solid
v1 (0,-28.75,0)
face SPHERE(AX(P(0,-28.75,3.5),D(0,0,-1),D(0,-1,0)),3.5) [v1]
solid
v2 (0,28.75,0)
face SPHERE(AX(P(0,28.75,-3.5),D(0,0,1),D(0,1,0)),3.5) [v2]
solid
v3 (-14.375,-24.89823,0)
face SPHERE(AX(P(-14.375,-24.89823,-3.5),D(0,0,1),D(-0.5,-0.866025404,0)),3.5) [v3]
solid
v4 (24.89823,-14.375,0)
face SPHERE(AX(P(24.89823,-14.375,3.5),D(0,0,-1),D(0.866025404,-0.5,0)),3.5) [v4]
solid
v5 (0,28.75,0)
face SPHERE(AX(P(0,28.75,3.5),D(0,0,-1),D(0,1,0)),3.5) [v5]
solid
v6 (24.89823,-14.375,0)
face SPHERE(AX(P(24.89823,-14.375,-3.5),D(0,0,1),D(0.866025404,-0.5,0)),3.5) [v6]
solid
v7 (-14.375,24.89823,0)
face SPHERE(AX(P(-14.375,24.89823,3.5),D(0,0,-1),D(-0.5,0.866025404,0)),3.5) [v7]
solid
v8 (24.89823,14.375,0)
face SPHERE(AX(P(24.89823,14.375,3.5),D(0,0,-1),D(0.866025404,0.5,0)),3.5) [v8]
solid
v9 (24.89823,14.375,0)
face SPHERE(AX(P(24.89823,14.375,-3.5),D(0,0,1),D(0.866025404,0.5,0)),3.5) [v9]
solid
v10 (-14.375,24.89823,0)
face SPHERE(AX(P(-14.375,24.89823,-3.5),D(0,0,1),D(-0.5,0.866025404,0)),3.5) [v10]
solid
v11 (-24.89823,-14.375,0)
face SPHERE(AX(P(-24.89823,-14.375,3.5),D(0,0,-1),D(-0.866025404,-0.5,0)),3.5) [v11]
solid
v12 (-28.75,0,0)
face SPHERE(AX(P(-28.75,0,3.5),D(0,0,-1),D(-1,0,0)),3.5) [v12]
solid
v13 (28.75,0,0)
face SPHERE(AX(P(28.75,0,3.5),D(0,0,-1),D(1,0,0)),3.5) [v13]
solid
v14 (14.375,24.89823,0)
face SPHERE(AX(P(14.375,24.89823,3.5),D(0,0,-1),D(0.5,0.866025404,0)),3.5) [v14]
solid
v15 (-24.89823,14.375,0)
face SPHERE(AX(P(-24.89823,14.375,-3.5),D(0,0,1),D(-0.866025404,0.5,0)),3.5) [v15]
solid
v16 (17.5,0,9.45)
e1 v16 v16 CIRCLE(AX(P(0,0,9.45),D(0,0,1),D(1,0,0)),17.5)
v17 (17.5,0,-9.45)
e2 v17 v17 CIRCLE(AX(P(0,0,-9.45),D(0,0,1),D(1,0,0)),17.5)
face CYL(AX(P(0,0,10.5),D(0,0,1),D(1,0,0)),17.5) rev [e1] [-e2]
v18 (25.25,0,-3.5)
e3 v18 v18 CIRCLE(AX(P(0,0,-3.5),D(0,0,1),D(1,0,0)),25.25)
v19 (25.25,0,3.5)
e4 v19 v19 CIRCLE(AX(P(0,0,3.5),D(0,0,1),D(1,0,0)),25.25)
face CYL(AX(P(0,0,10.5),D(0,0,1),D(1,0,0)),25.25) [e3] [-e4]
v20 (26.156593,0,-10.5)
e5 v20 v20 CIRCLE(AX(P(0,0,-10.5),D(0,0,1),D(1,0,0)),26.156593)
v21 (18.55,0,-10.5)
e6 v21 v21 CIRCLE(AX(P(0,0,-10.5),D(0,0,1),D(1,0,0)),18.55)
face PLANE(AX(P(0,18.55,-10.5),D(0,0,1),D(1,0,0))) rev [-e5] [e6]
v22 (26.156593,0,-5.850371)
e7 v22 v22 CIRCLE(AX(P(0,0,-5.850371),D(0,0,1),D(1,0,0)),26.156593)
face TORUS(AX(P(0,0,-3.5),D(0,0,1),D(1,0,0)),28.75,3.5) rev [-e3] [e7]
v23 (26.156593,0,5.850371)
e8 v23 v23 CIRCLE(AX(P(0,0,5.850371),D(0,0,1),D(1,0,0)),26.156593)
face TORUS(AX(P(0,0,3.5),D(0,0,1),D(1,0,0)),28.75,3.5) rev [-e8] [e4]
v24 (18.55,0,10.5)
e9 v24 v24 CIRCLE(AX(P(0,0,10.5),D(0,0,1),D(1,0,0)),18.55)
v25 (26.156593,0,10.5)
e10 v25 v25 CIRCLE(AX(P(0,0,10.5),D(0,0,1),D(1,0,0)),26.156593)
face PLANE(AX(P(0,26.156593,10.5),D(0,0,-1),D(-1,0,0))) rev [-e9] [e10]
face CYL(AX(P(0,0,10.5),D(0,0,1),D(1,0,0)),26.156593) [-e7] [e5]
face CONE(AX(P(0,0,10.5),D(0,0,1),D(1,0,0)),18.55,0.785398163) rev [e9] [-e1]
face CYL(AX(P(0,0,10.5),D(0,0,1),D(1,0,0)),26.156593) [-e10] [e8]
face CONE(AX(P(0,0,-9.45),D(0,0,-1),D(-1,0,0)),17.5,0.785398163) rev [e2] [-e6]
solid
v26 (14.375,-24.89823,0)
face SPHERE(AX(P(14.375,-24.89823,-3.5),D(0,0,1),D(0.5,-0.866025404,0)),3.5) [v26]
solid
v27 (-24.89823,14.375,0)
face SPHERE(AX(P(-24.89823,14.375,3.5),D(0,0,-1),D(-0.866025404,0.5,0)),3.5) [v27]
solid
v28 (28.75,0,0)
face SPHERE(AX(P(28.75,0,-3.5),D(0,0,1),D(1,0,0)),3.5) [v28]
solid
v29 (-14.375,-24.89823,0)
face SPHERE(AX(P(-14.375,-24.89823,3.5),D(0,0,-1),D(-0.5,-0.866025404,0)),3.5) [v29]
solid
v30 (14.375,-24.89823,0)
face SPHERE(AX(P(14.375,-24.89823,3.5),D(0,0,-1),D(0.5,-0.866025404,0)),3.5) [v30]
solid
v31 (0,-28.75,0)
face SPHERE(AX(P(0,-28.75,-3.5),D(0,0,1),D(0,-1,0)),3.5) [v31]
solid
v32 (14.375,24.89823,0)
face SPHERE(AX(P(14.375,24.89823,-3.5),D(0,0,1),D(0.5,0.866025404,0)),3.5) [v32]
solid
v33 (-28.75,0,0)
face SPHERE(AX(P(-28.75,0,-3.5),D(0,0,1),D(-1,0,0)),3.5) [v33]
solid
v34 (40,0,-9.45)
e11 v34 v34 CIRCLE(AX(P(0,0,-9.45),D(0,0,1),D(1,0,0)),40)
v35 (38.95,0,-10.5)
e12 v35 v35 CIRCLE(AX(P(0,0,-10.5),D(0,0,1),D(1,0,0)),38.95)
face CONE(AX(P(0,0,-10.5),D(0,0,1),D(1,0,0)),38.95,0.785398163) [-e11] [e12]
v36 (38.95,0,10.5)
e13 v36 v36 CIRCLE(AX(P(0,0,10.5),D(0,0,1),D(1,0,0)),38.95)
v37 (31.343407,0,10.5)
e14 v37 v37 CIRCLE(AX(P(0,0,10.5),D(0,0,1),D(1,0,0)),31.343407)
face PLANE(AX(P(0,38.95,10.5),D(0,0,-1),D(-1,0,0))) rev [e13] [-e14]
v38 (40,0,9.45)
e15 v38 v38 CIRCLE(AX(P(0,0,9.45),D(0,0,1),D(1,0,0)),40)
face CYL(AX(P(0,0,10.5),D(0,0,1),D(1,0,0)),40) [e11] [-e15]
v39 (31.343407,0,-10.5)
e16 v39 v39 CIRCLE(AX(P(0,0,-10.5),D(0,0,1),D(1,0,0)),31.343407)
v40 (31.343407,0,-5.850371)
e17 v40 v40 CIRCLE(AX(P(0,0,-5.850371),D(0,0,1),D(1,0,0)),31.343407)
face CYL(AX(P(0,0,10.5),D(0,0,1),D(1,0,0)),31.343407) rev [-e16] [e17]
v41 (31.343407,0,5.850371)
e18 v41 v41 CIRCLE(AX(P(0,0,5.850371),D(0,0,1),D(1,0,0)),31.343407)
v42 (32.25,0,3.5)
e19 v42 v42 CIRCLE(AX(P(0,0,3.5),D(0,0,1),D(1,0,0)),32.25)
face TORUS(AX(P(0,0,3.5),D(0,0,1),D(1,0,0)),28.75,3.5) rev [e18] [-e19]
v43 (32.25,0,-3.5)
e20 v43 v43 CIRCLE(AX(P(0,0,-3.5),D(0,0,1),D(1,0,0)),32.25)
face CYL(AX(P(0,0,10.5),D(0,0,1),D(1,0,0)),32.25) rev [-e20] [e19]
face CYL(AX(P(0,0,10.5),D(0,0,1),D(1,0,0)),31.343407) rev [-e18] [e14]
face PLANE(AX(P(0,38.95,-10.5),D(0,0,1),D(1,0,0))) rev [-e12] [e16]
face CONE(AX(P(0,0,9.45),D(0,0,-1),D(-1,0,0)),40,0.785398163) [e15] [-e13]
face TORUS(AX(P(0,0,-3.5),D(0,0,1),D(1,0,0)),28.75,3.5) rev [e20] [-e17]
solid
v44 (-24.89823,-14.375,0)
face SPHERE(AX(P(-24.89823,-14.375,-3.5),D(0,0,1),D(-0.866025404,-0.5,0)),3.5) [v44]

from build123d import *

# Parameters (mm, degrees)
CIRPATTERN1_ANGLE    = 180
CIRPATTERN1_2_ANGLE  = 180
CIRPATTERN1_3_ANGLE  = 180
CIRPATTERN1_4_ANGLE  = 180
CIRPATTERN1_5_ANGLE  = 180
CIRPATTERN1_6_ANGLE  = 180
CIRPATTERN1_7_ANGLE  = 180
CIRPATTERN1_8_ANGLE  = 180
CIRPATTERN1_9_ANGLE  = 180
CIRPATTERN1_10_ANGLE = 180
CIRPATTERN1_11_ANGLE = 180
CIRPATTERN1_12_ANGLE = 30
CIRPATTERN1_13_ANGLE = 60
CIRPATTERN1_14_ANGLE = 90
CIRPATTERN1_15_ANGLE = 120
CIRPATTERN1_16_ANGLE = 150
CIRPATTERN1_17_ANGLE = 180
CIRPATTERN1_18_ANGLE = 150
CIRPATTERN1_19_ANGLE = 120
CIRPATTERN1_20_ANGLE = 90
CIRPATTERN1_21_ANGLE = 60
CIRPATTERN1_22_ANGLE = 30


with BuildPart() as part:
    # Sketch1 → Revolve1 (revolve)
    with BuildSketch(Plane(origin=(0, 0, 0), x_dir=(0, 0, -1), z_dir=(1, 0, 0)), mode=Mode.PRIVATE) as revolve1_sk:
        with BuildLine():
            Line((9.45, 40), (-9.45, 40))
            Line((-9.45, 40), (-10.5, 38.95))
            Line((-10.5, 38.95), (-10.5, 31.343406593))
            Line((-10.5, 31.343406593), (-5.85037066, 31.343406593))
            ThreePointArc((-5.85037066, 31.343406593), (-4.759578684, 32.015495604), (-3.5, 32.25))
            Line((-3.5, 32.25), (3.5, 32.25))
            ThreePointArc((3.5, 32.25), (4.759578684, 32.015495604), (5.85037066, 31.343406593))
            Line((5.85037066, 31.343406593), (10.5, 31.343406593))
            Line((10.5, 31.343406593), (10.5, 38.95))
            Line((10.5, 38.95), (9.45, 40))
        make_face()
    revolve(revolve1_sk.sketch.rotate(Axis((0, 0, 10.5), (0, 0, -1)), 90), axis=Axis((0, 0, 10.5), (0, 0, -1)))


with BuildPart() as body_2:
    # Sketch3 → Revolve3 (revolve)
    with BuildSketch(Plane(origin=(0, 0, 0), x_dir=(0, 0, -1), z_dir=(1, 0, 0)), mode=Mode.PRIVATE) as revolve3_sk:
        with BuildLine():
            Line((-10.5, 26.156593407), (-5.85037066, 26.156593407))
            ThreePointArc((-5.85037066, 26.156593407), (-4.759578684, 25.484504396), (-3.5, 25.25))
            Line((-3.5, 25.25), (3.5, 25.25))
            ThreePointArc((3.5, 25.25), (4.759578684, 25.484504396), (5.85037066, 26.156593407))
            Line((5.85037066, 26.156593407), (10.5, 26.156593407))
            Line((10.5, 26.156593407), (10.5, 18.55))
            Line((10.5, 18.55), (9.45, 17.5))
            Line((9.45, 17.5), (-9.45, 17.5))
            Line((-9.45, 17.5), (-10.5, 18.55))
            Line((-10.5, 18.55), (-10.5, 26.156593407))
        make_face()
    revolve(revolve3_sk.sketch.rotate(Axis((0, 0, 10.5), (0, 0, -1)), 90), axis=Axis((0, 0, 10.5), (0, 0, -1)))


with BuildPart() as body_3:
    # Sketch4 → Revolve4 (revolve)
    with BuildSketch(Plane(origin=(0, 0, 0), x_dir=(0, 0, -1), z_dir=(1, 0, 0))):
        with BuildLine():
            Line((0, 28.75), (7, 28.75))
            ThreePointArc((7, 28.75), (3.5, 32.25), (0, 28.75))
        make_face()
    revolve(axis=Axis((0, 28.75, 0), (0, 0, -1)))


with BuildPart() as body_4:
    # Mirror1: mirrored copy
    add(body_3.part.mirror(Plane.XY))


with BuildPart() as body_5:
    # CirPattern1: read off the stored shape, not the designer's step
    # CirPattern1: copy of body 4
    add(body_4.part.rotate(Axis((0, 0, 0), (0.2588190451, -0.9659258263, 0)), CIRPATTERN1_ANGLE))


with BuildPart() as body_6:
    # CirPattern1 2: copy of body 4
    add(body_4.part.rotate(Axis((0, 0, 0), (0.5, -0.8660254038, 0)), CIRPATTERN1_2_ANGLE))


with BuildPart() as body_7:
    # CirPattern1 3: copy of body 4
    add(body_4.part.rotate(Axis((0, 0, 0), (0.7071067812, -0.7071067812, 0)), CIRPATTERN1_3_ANGLE))


with BuildPart() as body_8:
    # CirPattern1 4: copy of body 4
    add(body_4.part.rotate(Axis((0, 0, 0), (0.8660254038, -0.5, 0)), CIRPATTERN1_4_ANGLE))


with BuildPart() as body_9:
    # CirPattern1 5: copy of body 4
    add(body_4.part.rotate(Axis((0, 0, 0), (0.9659258263, -0.2588190451, 0)), CIRPATTERN1_5_ANGLE))


with BuildPart() as body_10:
    # CirPattern1 6: copy of body 4
    add(body_4.part.rotate(Axis((0, 0, 0), (1, 0, 0)), CIRPATTERN1_6_ANGLE))


with BuildPart() as body_11:
    # CirPattern1 7: copy of body 4
    add(body_4.part.rotate(Axis((0, 0, 0), (0.9659258263, 0.2588190451, 0)), CIRPATTERN1_7_ANGLE))


with BuildPart() as body_12:
    # CirPattern1 8: copy of body 4
    add(body_4.part.rotate(Axis((0, 0, 0), (0.8660254038, 0.5, 0)), CIRPATTERN1_8_ANGLE))


with BuildPart() as body_13:
    # CirPattern1 9: copy of body 4
    add(body_4.part.rotate(Axis((0, 0, 0), (0.7071067812, 0.7071067812, 0)), CIRPATTERN1_9_ANGLE))


with BuildPart() as body_14:
    # CirPattern1 10: copy of body 4
    add(body_4.part.rotate(Axis((0, 0, 0), (0.5, 0.8660254038, 0)), CIRPATTERN1_10_ANGLE))


with BuildPart() as body_15:
    # CirPattern1 11: copy of body 4
    add(body_4.part.rotate(Axis((0, 0, 0), (0.2588190451, 0.9659258263, 0)), CIRPATTERN1_11_ANGLE))


with BuildPart() as body_16:
    # CirPattern1 12: copy of body 4
    add(body_4.part.rotate(Axis((0, 0, 0), (0, 0, 1)), CIRPATTERN1_12_ANGLE))


with BuildPart() as body_17:
    # CirPattern1 13: copy of body 4
    add(body_4.part.rotate(Axis((0, 0, 0), (0, 0, 1)), CIRPATTERN1_13_ANGLE))


with BuildPart() as body_18:
    # CirPattern1 14: copy of body 4
    add(body_4.part.rotate(Axis((0, 0, 0), (0, 0, 1)), CIRPATTERN1_14_ANGLE))


with BuildPart() as body_19:
    # CirPattern1 15: copy of body 4
    add(body_4.part.rotate(Axis((0, 0, 0), (0, 0, 1)), CIRPATTERN1_15_ANGLE))


with BuildPart() as body_20:
    # CirPattern1 16: copy of body 4
    add(body_4.part.rotate(Axis((0, 0, 0), (0, 0, 1)), CIRPATTERN1_16_ANGLE))


with BuildPart() as body_21:
    # CirPattern1 17: copy of body 4
    add(body_4.part.rotate(Axis((0, 0, 0), (0, 0, 1)), CIRPATTERN1_17_ANGLE))


with BuildPart() as body_22:
    # CirPattern1 18: copy of body 4
    add(body_4.part.rotate(Axis((0, 0, 0), (0, 0, -1)), CIRPATTERN1_18_ANGLE))


with BuildPart() as body_23:
    # CirPattern1 19: copy of body 4
    add(body_4.part.rotate(Axis((0, 0, 0), (0, 0, -1)), CIRPATTERN1_19_ANGLE))


with BuildPart() as body_24:
    # CirPattern1 20: copy of body 4
    add(body_4.part.rotate(Axis((0, 0, 0), (0, 0, -1)), CIRPATTERN1_20_ANGLE))


with BuildPart() as body_25:
    # CirPattern1 21: copy of body 4
    add(body_4.part.rotate(Axis((0, 0, 0), (0, 0, -1)), CIRPATTERN1_21_ANGLE))


with BuildPart() as body_26:
    # CirPattern1 22: copy of body 4
    add(body_4.part.rotate(Axis((0, 0, 0), (0, 0, -1)), CIRPATTERN1_22_ANGLE))


solid = Compound([part.part, body_2.part, body_3.part, body_4.part, body_5.part, body_6.part, body_7.part, body_8.part, body_9.part, body_10.part, body_11.part, body_12.part, body_13.part, body_14.part, body_15.part, body_16.part, body_17.part, body_18.part, body_19.part, body_20.part, body_21.part, body_22.part, body_23.part, body_24.part, body_25.part, body_26.part])
